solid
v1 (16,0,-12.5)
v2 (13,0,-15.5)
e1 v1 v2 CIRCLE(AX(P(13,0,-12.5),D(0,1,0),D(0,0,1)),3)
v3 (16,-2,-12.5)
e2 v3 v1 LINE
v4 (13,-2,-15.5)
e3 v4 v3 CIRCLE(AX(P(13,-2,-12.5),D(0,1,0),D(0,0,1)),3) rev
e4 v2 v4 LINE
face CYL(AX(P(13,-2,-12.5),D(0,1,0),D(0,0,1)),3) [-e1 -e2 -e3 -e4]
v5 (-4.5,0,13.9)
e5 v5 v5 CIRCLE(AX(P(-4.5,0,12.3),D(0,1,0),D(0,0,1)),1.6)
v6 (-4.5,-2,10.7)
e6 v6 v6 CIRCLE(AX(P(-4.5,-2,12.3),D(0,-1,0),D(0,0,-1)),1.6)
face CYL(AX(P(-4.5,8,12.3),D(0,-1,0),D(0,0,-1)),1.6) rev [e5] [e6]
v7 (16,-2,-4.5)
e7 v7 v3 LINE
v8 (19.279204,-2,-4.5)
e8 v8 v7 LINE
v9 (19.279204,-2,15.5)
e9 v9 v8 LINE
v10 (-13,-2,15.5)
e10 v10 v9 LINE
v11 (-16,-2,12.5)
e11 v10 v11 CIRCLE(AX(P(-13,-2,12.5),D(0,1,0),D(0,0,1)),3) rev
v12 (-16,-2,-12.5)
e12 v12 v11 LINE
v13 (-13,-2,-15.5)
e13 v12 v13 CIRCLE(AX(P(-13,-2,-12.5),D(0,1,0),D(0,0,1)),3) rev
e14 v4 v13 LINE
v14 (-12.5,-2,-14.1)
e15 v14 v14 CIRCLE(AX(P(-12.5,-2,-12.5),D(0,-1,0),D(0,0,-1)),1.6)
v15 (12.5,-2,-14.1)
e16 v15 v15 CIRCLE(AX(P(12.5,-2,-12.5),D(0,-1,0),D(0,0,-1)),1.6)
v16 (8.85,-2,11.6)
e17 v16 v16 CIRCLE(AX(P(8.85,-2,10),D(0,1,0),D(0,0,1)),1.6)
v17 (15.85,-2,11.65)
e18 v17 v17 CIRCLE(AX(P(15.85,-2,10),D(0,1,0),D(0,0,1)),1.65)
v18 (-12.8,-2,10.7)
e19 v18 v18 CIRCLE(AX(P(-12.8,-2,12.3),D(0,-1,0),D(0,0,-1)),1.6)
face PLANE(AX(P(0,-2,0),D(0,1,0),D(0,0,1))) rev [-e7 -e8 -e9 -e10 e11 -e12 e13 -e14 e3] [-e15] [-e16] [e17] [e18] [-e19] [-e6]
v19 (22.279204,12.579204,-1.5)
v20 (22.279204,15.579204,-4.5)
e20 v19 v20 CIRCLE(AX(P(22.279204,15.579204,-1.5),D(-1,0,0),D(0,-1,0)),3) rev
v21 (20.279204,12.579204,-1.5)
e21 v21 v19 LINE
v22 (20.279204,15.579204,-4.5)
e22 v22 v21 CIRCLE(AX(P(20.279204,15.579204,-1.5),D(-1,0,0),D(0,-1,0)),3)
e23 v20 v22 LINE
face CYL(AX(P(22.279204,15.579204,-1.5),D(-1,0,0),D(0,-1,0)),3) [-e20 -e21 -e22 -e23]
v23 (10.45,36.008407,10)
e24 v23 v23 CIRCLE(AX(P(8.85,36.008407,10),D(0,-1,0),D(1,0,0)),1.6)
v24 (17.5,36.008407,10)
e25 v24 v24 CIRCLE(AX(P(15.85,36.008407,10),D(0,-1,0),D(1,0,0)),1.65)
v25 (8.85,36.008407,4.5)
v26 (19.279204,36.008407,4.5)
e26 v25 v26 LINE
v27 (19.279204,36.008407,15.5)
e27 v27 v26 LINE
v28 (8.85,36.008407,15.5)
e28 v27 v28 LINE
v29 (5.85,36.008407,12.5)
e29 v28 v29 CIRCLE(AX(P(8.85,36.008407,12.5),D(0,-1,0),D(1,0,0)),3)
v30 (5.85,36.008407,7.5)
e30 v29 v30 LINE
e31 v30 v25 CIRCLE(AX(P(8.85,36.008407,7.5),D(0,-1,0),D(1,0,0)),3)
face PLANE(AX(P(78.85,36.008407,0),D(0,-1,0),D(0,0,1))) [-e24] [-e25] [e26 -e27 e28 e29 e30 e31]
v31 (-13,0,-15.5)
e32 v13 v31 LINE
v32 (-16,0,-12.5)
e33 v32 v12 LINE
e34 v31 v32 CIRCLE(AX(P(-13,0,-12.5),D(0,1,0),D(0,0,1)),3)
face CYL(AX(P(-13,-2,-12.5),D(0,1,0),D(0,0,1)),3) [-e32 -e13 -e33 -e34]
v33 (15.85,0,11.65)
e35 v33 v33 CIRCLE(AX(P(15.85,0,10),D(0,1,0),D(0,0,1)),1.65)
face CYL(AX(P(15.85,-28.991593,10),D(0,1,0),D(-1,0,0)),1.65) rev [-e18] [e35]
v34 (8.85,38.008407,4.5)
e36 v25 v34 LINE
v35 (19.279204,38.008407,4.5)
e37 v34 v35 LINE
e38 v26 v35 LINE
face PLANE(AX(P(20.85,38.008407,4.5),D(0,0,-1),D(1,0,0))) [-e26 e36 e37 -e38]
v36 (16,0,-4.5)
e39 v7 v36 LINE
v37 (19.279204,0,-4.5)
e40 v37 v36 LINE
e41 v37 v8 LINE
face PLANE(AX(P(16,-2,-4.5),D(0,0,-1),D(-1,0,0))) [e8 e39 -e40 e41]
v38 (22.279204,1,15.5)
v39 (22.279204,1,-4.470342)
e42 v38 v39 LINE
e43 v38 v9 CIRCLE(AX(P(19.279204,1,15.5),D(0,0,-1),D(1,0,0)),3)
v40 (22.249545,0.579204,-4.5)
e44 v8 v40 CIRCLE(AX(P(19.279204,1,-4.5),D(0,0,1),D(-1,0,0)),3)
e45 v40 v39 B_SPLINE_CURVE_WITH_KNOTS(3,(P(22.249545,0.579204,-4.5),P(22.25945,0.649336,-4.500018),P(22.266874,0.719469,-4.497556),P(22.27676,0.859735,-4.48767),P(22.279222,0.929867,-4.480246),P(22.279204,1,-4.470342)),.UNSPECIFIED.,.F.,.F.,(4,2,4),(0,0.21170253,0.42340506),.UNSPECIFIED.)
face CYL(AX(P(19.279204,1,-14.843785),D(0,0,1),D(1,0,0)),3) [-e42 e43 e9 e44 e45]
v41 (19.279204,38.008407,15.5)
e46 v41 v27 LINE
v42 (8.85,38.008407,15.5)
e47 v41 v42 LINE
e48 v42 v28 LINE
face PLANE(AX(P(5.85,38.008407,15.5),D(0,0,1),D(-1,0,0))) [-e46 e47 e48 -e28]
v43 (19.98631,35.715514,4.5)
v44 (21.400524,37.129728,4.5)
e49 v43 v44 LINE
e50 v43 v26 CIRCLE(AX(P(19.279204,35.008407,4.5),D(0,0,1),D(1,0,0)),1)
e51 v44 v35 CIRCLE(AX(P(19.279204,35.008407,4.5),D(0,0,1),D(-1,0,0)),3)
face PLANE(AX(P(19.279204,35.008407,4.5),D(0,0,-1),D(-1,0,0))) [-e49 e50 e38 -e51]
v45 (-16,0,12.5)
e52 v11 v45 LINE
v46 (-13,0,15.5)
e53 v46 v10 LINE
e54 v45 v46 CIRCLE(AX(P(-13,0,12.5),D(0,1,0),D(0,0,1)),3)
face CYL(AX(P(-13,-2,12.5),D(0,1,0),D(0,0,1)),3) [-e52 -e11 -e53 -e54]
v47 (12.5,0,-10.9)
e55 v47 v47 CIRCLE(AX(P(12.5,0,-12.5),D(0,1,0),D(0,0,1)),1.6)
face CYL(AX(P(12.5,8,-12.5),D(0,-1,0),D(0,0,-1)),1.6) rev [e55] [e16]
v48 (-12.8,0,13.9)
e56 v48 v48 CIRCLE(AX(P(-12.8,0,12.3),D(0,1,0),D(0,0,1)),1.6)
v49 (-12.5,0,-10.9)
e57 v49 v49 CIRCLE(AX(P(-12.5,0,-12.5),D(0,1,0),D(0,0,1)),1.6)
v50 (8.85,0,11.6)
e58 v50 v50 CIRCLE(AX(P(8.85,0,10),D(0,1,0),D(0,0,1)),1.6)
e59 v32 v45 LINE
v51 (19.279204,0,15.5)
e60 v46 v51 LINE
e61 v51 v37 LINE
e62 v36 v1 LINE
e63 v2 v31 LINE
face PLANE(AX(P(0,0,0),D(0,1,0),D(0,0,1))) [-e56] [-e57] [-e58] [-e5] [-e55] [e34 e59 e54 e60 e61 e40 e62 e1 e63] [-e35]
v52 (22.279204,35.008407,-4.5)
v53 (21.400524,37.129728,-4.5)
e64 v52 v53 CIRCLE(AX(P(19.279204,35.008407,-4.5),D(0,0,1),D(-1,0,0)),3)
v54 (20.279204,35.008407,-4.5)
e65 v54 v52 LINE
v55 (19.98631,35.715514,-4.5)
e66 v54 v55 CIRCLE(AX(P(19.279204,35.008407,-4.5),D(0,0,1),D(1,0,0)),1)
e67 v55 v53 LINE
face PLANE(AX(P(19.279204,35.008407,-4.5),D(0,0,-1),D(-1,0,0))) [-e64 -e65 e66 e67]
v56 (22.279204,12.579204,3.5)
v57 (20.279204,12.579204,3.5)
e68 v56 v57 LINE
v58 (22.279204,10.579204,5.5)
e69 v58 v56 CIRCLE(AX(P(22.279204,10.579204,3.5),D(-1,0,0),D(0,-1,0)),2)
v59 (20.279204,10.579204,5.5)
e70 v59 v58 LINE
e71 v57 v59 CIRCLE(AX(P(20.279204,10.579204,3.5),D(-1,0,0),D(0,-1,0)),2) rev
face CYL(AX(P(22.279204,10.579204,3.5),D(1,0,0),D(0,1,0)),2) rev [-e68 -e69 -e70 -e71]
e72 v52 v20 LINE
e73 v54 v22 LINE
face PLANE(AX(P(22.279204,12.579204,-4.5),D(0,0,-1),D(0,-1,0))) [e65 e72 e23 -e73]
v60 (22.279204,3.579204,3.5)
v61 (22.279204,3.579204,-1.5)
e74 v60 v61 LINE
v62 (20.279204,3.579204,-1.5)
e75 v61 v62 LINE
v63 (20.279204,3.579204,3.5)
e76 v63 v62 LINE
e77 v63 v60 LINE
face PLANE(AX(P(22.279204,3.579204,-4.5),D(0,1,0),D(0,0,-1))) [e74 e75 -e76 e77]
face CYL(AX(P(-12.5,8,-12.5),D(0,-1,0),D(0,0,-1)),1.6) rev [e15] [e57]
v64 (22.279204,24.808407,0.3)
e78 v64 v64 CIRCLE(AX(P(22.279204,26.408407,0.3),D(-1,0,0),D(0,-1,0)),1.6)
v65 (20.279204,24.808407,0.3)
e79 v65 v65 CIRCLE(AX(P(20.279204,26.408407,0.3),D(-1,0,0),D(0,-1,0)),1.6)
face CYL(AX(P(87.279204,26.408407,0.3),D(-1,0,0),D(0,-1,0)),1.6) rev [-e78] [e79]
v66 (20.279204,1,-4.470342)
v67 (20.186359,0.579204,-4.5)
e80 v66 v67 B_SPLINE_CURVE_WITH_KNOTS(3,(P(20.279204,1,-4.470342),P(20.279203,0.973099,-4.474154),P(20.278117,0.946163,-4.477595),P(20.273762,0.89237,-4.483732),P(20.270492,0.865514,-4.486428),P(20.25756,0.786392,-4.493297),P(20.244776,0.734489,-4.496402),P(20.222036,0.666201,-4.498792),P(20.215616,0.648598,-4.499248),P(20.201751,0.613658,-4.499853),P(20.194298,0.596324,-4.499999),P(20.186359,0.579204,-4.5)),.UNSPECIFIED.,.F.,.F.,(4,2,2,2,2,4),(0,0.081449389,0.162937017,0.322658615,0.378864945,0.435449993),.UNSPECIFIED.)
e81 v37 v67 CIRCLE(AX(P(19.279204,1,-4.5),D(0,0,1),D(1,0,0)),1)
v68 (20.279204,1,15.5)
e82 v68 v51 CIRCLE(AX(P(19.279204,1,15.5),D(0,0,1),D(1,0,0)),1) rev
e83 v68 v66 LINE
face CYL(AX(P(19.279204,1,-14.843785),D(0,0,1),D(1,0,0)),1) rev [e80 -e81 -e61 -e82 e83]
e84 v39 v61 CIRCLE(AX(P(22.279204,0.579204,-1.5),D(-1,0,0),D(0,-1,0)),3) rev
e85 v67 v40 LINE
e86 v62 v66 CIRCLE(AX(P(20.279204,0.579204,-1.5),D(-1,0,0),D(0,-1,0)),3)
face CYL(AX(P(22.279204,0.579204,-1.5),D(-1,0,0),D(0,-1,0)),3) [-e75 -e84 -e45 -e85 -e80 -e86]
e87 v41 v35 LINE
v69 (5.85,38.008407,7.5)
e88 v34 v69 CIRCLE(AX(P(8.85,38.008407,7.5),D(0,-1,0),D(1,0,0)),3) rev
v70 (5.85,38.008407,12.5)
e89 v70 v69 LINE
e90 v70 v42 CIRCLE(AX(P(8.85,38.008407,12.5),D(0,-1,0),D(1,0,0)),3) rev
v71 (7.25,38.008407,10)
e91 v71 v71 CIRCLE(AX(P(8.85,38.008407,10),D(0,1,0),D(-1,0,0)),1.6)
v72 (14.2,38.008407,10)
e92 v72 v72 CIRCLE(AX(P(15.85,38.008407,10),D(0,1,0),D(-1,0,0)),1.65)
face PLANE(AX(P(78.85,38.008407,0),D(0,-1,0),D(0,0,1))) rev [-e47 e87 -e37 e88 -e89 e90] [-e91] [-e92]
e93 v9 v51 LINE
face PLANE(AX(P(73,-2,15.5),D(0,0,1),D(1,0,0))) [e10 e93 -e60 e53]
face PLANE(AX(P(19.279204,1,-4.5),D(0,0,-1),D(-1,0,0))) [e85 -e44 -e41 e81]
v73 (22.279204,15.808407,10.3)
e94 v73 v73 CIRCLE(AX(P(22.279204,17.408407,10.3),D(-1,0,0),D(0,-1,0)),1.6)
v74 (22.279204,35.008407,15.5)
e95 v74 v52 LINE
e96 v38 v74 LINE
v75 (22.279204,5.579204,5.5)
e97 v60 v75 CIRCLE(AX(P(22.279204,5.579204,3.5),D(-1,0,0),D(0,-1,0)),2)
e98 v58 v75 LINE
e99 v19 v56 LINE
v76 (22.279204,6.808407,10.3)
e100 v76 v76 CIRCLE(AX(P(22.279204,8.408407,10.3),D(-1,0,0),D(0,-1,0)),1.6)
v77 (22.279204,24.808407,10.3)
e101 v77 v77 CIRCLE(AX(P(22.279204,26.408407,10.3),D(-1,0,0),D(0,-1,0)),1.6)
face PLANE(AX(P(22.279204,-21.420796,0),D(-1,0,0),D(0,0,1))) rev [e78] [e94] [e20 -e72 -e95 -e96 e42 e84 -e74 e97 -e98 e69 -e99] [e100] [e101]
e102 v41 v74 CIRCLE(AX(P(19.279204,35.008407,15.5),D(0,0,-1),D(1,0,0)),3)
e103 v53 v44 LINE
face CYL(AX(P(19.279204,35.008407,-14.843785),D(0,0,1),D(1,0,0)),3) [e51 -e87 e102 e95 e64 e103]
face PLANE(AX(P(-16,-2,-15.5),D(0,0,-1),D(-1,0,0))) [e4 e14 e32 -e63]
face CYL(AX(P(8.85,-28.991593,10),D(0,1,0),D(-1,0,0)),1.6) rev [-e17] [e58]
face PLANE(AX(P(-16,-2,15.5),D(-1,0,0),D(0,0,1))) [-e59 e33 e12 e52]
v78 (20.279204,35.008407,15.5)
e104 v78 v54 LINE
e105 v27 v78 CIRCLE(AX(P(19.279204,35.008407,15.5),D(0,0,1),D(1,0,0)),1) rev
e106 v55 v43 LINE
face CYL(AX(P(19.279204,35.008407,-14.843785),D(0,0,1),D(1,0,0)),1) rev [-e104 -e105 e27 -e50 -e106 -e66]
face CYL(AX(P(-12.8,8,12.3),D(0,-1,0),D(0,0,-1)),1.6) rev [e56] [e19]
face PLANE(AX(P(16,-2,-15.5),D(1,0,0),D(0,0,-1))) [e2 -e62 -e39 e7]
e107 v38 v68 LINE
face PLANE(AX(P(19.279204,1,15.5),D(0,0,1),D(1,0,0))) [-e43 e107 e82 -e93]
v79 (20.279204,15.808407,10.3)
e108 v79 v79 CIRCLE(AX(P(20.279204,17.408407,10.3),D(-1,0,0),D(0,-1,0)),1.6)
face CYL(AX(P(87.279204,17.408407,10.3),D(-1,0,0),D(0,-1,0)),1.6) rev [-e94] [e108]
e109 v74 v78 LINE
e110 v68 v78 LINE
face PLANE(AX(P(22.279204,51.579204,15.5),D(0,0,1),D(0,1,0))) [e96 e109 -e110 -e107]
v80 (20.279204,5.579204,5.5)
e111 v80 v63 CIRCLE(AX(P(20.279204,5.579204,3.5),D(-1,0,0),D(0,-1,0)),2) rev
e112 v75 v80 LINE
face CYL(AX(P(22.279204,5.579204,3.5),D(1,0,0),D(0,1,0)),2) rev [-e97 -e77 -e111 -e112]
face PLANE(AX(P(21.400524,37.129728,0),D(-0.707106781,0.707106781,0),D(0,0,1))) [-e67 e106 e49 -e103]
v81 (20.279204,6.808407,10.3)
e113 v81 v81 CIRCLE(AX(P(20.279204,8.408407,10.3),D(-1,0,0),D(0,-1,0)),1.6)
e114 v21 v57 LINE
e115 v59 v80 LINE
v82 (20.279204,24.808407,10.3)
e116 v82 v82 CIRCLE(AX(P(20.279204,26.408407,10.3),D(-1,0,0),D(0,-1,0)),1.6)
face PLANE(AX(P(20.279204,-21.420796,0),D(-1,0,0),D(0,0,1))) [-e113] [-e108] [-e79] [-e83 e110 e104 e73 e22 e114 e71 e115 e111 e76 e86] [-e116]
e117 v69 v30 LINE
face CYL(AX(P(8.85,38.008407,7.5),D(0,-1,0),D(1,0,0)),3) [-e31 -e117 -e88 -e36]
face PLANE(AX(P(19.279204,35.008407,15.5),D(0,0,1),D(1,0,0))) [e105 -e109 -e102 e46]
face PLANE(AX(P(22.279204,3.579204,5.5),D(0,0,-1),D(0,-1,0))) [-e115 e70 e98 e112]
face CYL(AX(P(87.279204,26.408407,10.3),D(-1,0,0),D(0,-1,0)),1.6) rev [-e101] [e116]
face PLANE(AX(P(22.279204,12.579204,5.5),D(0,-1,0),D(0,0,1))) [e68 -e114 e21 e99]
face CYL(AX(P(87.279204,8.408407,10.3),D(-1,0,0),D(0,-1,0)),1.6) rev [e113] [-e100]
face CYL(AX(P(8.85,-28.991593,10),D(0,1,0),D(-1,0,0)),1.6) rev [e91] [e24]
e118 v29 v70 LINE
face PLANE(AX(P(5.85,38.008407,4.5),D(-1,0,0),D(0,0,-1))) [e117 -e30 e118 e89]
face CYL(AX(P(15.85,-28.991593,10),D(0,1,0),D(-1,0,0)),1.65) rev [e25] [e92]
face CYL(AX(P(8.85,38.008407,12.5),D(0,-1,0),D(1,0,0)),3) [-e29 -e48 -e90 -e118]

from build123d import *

# Parameters (mm, degrees)
SM_BASE_FLANGE_1_DEPTH = 2
OTHER_START            = -4.5
OTHER_1_DEPTH          = 20
OTHER_1_2_OUTLINE_W    = 2
OTHER_1_2_OUTLINE_H    = 24
OTHER_1_2_DEPTH        = 20
OTHER_START_2          = 5.5
OTHER_1_3_OUTLINE_W    = 2
OTHER_1_3_OUTLINE_H    = 15
OTHER_1_3_OUTLINE_H_2  = 9
OTHER_1_3_DEPTH        = 10
OTHER_START_3          = 4.5
OTHER_1_4_OUTLINE_W    = 2
OTHER_1_4_OUTLINE_H    = 15
OTHER_1_4_DEPTH        = 1
OTHER_2_DEPTH          = 20
OTHER_2_2_DEPTH        = 9
OTHER_2_3_DEPTH        = 11
OTHER_2_4_DEPTH        = 9
SKETCH_4_R             = 1.6
CUT_EXTRUDE_1_DEPTH    = 10
SKETCH_6_R             = 1.6
CUT_EXTRUDE_2_DEPTH    = 10
CUT_EXTRUDE_3_DEPTH    = 67
SKETCH_10_R            = 1.6
CUT_EXTRUDE_4_DEPTH    = 67
FILLET_1_R             = 3
FILLET_2_R             = 2


# Read off the part's stored shape, not the designer's step: 绘制的折弯1, 绘制的折弯2
# Sheet-metal steps are written as plain solids
with BuildPart() as part:
    # Sketch 1 → 基体-法兰1 (new body)
    with BuildSketch(Plane(origin=(0, 0, 0), x_dir=(1, 0, 0), z_dir=(0, 1, 0))):
        Polygon((-16, -15.5), (16, -15.5), (73, -15.5), (73, -4.5), (58, -4.5), (58, 4.5), (34, 4.5), (34, -5.5), (25, -5.5), (25, 4.5), (16, 4.5), (16, 15.5), (-16, 15.5), align=None)
    extrude(amount=-SM_BASE_FLANGE_1_DEPTH)

    # Other 1 outline → Other 1 (cut)
    with BuildSketch(Plane.XY.offset(OTHER_START)):
        with BuildLine():
            ThreePointArc((22.107630798, 0), (21.011254481, -1.449489743), (19.279203673, -2))
            Line((19.279203673, -2), (73, -2))
            Line((73, -2), (73, 0))
            Line((73, 0), (22.107630798, 0))
        make_face()
    extrude(amount=OTHER_1_DEPTH, mode=Mode.SUBTRACT)

    # Other 1 2 outline → Other 1 2 (add)
    with BuildSketch(Plane.XY.offset(OTHER_START)):
        with Locations((21.279203673, 24.579203673)):
            Rectangle(OTHER_1_2_OUTLINE_W, OTHER_1_2_OUTLINE_H)
        with BuildLine():
            Line((22.279203673, 1), (22.279203673, 3.579203673))
            Line((22.279203673, 3.579203673), (20.279203673, 3.579203673))
            Line((20.279203673, 3.579203673), (20.279203673, 1))
            ThreePointArc((20.279203673, 1), (19.986310454, 0.292893219), (19.279203673, 0))
            Line((19.279203673, 0), (22.107630798, 0))
            ThreePointArc((22.107630798, 0), (22.235999352, 0.492694064), (22.279203673, 1))
        make_face()
    extrude(amount=OTHER_1_2_DEPTH)

    # Other 1 3 outline → Other 1 3 (add)
    with BuildSketch(Plane.XY.offset(OTHER_START_2)):
        with Locations((21.279203673, 44.079203673)):
            Rectangle(OTHER_1_3_OUTLINE_W, OTHER_1_3_OUTLINE_H)
        with Locations((21.279203673, 8.079203673)):
            Rectangle(OTHER_1_3_OUTLINE_W, OTHER_1_3_OUTLINE_H_2)
    extrude(amount=OTHER_1_3_DEPTH)

    # Other 1 4 outline → Other 1 4 (add)
    with BuildSketch(Plane.XY.offset(OTHER_START_3)):
        with Locations((21.279203673, 44.079203673)):
            Rectangle(OTHER_1_4_OUTLINE_W, OTHER_1_4_OUTLINE_H)
    extrude(amount=OTHER_1_4_DEPTH)

    # Other 2 outline → Other 2 (cut)
    with BuildSketch(Plane.XY.offset(OTHER_START)):
        with BuildLine():
            ThreePointArc((20.279203673, 37.836834471), (21.728693416, 36.740458154), (22.279203673, 35.008407346))
            Line((22.279203673, 35.008407346), (22.279203673, 51.579203673))
            Line((22.279203673, 51.579203673), (20.279203673, 51.579203673))
            Line((20.279203673, 51.579203673), (20.279203673, 37.836834471))
        make_face()
    extrude(amount=OTHER_2_DEPTH, mode=Mode.SUBTRACT)

    # Other 2 2 outline → Other 2 2 (cut)
    with BuildSketch(Plane.XY.offset(OTHER_START)):
        Polygon((20.279203673, 36.008407347), (20.85, 36.579203673), (20.279203673, 36.579203673), align=None)
    extrude(amount=OTHER_2_2_DEPTH, mode=Mode.SUBTRACT)

    # Other 2 3 outline → Other 2 3 (add)
    with BuildSketch(Plane.XY.offset(OTHER_START_3)):
        with BuildLine():
            ThreePointArc((20.279203673, 37.836834471), (19.786509609, 37.965203025), (19.279203673, 38.008407346))
            Line((19.279203673, 38.008407346), (5.85, 38.008407346))
            Line((5.85, 38.008407346), (5.85, 36.008407346))
            Line((5.85, 36.008407346), (19.279203673, 36.008407346))
            ThreePointArc((19.279203673, 36.008407346), (19.986310455, 35.715514128), (20.279203673, 35.008407346))
            Line((20.279203673, 35.008407346), (20.279203673, 37.836834471))
        make_face()
    extrude(amount=OTHER_2_3_DEPTH)

    # Other 2 4 outline → Other 2 4 (add)
    with BuildSketch(Plane.XY.offset(OTHER_START)):
        with BuildLine():
            ThreePointArc((21.835098605, 36.579203673), (21.633955222, 36.867209419), (21.400524017, 37.12972769))
            Line((21.400524017, 37.12972769), (20.85, 36.579203673))
            Line((20.85, 36.579203673), (21.835098605, 36.579203673))
        make_face()
        with BuildLine():
            Line((20.279203673, 35.008407346), (20.279203673, 36.008407347))
            Line((20.279203673, 36.008407347), (19.986310454, 35.715514128))
            ThreePointArc((19.986310454, 35.715514128), (20.203083206, 35.391090779), (20.279203673, 35.008407346))
        make_face()
    extrude(amount=OTHER_2_4_DEPTH)

    # 草图4 → 切除-拉伸1 (cut)
    with BuildSketch(Plane(origin=(0, -2, 0), x_dir=(-1, 0, 0), z_dir=(0, -1, 0))):
        with Locations(Location((-12.5, 12.5, 0), (0, 0, 90))):
            Circle(SKETCH_4_R)
        with Locations(Location((12.5, 12.5, 0), (0, 0, 90))):
            Circle(SKETCH_4_R)
    extrude(amount=-CUT_EXTRUDE_1_DEPTH, mode=Mode.SUBTRACT)

    # 草图6 → 切除-拉伸2 (cut)
    with BuildSketch(Plane(origin=(0, -2, 0), x_dir=(-1, 0, 0), z_dir=(0, -1, 0))):
        with Locations(Location((12.8, -12.3, 0), (0, 0, 90))):
            Circle(SKETCH_6_R)
        with Locations(Location((4.5, -12.3, 0), (0, 0, 90))):
            Circle(SKETCH_6_R)
    extrude(amount=-CUT_EXTRUDE_2_DEPTH, mode=Mode.SUBTRACT)

    # 草图8 → 切除-拉伸3 (cut)
    with BuildSketch(Plane(origin=(0, 38.008407346, 0), x_dir=(1, 0, 0), z_dir=(0, 1, 0))):
        with BuildLine():
            Line((7.25, -10), (8.85, -10))
            Line((8.85, -10), (10.45, -10))
            ThreePointArc((10.45, -10), (8.85, -8.4), (7.25, -10))
        make_face()
        with BuildLine():
            Line((10.45, -10), (8.85, -10))
            Line((8.85, -10), (7.25, -10))
            ThreePointArc((7.25, -10), (8.85, -11.6), (10.45, -10))
        make_face()
        with BuildLine():
            ThreePointArc((17.5, -10), (15.85, -8.35), (14.2, -10))
            Line((14.2, -10), (15.85, -10))
            Line((15.85, -10), (17.5, -10))
        make_face()
        with BuildLine():
            Line((15.85, -10), (14.2, -10))
            ThreePointArc((14.2, -10), (15.85, -11.65), (17.5, -10))
            Line((17.5, -10), (15.85, -10))
        make_face()
    extrude(amount=-CUT_EXTRUDE_3_DEPTH, mode=Mode.SUBTRACT)

    # 草图10 → 切除-拉伸4 (cut)
    with BuildSketch(Plane.ZY.offset(-20.279203673)):
        with Locations(Location((10.3, 8.408407346, 0), (0, 0, 270))):
            Circle(SKETCH_10_R)
        with Locations(Location((10.3, 17.408407346, 0), (0, 0, 270))):
            Circle(SKETCH_10_R)
        with Locations(Location((10.3, 26.408407346, 0), (0, 0, 270))):
            Circle(SKETCH_10_R)
        with Locations(Location((0.3, 26.408407346, 0), (0, 0, 270))):
            Circle(SKETCH_10_R)
    extrude(amount=-CUT_EXTRUDE_4_DEPTH, mode=Mode.SUBTRACT)

    # 圆角1
    fillet_1_edges = [part.edges().sort_by_distance(p)[0] for p in [
        (21.279203673, 12.579203673, -4.5),
        (21.279203673, 3.579203673, -4.5),
        (16, -1, -15.5),
        (5.85, 37.008407346, 4.5),
        (5.85, 37.008407346, 15.5),
        (-16, -1, 15.5),
        (-16, -1, -15.5),
    ]]
    fillet(fillet_1_edges, radius=FILLET_1_R)

    # 圆角2
    fillet_2_edges = [part.edges().sort_by_distance(p)[0] for p in [
        (21.279203673, 3.579203673, 5.5),
        (21.279203673, 12.579203673, 5.5),
    ]]
    fillet(fillet_2_edges, radius=FILLET_2_R)


solid = part.part
